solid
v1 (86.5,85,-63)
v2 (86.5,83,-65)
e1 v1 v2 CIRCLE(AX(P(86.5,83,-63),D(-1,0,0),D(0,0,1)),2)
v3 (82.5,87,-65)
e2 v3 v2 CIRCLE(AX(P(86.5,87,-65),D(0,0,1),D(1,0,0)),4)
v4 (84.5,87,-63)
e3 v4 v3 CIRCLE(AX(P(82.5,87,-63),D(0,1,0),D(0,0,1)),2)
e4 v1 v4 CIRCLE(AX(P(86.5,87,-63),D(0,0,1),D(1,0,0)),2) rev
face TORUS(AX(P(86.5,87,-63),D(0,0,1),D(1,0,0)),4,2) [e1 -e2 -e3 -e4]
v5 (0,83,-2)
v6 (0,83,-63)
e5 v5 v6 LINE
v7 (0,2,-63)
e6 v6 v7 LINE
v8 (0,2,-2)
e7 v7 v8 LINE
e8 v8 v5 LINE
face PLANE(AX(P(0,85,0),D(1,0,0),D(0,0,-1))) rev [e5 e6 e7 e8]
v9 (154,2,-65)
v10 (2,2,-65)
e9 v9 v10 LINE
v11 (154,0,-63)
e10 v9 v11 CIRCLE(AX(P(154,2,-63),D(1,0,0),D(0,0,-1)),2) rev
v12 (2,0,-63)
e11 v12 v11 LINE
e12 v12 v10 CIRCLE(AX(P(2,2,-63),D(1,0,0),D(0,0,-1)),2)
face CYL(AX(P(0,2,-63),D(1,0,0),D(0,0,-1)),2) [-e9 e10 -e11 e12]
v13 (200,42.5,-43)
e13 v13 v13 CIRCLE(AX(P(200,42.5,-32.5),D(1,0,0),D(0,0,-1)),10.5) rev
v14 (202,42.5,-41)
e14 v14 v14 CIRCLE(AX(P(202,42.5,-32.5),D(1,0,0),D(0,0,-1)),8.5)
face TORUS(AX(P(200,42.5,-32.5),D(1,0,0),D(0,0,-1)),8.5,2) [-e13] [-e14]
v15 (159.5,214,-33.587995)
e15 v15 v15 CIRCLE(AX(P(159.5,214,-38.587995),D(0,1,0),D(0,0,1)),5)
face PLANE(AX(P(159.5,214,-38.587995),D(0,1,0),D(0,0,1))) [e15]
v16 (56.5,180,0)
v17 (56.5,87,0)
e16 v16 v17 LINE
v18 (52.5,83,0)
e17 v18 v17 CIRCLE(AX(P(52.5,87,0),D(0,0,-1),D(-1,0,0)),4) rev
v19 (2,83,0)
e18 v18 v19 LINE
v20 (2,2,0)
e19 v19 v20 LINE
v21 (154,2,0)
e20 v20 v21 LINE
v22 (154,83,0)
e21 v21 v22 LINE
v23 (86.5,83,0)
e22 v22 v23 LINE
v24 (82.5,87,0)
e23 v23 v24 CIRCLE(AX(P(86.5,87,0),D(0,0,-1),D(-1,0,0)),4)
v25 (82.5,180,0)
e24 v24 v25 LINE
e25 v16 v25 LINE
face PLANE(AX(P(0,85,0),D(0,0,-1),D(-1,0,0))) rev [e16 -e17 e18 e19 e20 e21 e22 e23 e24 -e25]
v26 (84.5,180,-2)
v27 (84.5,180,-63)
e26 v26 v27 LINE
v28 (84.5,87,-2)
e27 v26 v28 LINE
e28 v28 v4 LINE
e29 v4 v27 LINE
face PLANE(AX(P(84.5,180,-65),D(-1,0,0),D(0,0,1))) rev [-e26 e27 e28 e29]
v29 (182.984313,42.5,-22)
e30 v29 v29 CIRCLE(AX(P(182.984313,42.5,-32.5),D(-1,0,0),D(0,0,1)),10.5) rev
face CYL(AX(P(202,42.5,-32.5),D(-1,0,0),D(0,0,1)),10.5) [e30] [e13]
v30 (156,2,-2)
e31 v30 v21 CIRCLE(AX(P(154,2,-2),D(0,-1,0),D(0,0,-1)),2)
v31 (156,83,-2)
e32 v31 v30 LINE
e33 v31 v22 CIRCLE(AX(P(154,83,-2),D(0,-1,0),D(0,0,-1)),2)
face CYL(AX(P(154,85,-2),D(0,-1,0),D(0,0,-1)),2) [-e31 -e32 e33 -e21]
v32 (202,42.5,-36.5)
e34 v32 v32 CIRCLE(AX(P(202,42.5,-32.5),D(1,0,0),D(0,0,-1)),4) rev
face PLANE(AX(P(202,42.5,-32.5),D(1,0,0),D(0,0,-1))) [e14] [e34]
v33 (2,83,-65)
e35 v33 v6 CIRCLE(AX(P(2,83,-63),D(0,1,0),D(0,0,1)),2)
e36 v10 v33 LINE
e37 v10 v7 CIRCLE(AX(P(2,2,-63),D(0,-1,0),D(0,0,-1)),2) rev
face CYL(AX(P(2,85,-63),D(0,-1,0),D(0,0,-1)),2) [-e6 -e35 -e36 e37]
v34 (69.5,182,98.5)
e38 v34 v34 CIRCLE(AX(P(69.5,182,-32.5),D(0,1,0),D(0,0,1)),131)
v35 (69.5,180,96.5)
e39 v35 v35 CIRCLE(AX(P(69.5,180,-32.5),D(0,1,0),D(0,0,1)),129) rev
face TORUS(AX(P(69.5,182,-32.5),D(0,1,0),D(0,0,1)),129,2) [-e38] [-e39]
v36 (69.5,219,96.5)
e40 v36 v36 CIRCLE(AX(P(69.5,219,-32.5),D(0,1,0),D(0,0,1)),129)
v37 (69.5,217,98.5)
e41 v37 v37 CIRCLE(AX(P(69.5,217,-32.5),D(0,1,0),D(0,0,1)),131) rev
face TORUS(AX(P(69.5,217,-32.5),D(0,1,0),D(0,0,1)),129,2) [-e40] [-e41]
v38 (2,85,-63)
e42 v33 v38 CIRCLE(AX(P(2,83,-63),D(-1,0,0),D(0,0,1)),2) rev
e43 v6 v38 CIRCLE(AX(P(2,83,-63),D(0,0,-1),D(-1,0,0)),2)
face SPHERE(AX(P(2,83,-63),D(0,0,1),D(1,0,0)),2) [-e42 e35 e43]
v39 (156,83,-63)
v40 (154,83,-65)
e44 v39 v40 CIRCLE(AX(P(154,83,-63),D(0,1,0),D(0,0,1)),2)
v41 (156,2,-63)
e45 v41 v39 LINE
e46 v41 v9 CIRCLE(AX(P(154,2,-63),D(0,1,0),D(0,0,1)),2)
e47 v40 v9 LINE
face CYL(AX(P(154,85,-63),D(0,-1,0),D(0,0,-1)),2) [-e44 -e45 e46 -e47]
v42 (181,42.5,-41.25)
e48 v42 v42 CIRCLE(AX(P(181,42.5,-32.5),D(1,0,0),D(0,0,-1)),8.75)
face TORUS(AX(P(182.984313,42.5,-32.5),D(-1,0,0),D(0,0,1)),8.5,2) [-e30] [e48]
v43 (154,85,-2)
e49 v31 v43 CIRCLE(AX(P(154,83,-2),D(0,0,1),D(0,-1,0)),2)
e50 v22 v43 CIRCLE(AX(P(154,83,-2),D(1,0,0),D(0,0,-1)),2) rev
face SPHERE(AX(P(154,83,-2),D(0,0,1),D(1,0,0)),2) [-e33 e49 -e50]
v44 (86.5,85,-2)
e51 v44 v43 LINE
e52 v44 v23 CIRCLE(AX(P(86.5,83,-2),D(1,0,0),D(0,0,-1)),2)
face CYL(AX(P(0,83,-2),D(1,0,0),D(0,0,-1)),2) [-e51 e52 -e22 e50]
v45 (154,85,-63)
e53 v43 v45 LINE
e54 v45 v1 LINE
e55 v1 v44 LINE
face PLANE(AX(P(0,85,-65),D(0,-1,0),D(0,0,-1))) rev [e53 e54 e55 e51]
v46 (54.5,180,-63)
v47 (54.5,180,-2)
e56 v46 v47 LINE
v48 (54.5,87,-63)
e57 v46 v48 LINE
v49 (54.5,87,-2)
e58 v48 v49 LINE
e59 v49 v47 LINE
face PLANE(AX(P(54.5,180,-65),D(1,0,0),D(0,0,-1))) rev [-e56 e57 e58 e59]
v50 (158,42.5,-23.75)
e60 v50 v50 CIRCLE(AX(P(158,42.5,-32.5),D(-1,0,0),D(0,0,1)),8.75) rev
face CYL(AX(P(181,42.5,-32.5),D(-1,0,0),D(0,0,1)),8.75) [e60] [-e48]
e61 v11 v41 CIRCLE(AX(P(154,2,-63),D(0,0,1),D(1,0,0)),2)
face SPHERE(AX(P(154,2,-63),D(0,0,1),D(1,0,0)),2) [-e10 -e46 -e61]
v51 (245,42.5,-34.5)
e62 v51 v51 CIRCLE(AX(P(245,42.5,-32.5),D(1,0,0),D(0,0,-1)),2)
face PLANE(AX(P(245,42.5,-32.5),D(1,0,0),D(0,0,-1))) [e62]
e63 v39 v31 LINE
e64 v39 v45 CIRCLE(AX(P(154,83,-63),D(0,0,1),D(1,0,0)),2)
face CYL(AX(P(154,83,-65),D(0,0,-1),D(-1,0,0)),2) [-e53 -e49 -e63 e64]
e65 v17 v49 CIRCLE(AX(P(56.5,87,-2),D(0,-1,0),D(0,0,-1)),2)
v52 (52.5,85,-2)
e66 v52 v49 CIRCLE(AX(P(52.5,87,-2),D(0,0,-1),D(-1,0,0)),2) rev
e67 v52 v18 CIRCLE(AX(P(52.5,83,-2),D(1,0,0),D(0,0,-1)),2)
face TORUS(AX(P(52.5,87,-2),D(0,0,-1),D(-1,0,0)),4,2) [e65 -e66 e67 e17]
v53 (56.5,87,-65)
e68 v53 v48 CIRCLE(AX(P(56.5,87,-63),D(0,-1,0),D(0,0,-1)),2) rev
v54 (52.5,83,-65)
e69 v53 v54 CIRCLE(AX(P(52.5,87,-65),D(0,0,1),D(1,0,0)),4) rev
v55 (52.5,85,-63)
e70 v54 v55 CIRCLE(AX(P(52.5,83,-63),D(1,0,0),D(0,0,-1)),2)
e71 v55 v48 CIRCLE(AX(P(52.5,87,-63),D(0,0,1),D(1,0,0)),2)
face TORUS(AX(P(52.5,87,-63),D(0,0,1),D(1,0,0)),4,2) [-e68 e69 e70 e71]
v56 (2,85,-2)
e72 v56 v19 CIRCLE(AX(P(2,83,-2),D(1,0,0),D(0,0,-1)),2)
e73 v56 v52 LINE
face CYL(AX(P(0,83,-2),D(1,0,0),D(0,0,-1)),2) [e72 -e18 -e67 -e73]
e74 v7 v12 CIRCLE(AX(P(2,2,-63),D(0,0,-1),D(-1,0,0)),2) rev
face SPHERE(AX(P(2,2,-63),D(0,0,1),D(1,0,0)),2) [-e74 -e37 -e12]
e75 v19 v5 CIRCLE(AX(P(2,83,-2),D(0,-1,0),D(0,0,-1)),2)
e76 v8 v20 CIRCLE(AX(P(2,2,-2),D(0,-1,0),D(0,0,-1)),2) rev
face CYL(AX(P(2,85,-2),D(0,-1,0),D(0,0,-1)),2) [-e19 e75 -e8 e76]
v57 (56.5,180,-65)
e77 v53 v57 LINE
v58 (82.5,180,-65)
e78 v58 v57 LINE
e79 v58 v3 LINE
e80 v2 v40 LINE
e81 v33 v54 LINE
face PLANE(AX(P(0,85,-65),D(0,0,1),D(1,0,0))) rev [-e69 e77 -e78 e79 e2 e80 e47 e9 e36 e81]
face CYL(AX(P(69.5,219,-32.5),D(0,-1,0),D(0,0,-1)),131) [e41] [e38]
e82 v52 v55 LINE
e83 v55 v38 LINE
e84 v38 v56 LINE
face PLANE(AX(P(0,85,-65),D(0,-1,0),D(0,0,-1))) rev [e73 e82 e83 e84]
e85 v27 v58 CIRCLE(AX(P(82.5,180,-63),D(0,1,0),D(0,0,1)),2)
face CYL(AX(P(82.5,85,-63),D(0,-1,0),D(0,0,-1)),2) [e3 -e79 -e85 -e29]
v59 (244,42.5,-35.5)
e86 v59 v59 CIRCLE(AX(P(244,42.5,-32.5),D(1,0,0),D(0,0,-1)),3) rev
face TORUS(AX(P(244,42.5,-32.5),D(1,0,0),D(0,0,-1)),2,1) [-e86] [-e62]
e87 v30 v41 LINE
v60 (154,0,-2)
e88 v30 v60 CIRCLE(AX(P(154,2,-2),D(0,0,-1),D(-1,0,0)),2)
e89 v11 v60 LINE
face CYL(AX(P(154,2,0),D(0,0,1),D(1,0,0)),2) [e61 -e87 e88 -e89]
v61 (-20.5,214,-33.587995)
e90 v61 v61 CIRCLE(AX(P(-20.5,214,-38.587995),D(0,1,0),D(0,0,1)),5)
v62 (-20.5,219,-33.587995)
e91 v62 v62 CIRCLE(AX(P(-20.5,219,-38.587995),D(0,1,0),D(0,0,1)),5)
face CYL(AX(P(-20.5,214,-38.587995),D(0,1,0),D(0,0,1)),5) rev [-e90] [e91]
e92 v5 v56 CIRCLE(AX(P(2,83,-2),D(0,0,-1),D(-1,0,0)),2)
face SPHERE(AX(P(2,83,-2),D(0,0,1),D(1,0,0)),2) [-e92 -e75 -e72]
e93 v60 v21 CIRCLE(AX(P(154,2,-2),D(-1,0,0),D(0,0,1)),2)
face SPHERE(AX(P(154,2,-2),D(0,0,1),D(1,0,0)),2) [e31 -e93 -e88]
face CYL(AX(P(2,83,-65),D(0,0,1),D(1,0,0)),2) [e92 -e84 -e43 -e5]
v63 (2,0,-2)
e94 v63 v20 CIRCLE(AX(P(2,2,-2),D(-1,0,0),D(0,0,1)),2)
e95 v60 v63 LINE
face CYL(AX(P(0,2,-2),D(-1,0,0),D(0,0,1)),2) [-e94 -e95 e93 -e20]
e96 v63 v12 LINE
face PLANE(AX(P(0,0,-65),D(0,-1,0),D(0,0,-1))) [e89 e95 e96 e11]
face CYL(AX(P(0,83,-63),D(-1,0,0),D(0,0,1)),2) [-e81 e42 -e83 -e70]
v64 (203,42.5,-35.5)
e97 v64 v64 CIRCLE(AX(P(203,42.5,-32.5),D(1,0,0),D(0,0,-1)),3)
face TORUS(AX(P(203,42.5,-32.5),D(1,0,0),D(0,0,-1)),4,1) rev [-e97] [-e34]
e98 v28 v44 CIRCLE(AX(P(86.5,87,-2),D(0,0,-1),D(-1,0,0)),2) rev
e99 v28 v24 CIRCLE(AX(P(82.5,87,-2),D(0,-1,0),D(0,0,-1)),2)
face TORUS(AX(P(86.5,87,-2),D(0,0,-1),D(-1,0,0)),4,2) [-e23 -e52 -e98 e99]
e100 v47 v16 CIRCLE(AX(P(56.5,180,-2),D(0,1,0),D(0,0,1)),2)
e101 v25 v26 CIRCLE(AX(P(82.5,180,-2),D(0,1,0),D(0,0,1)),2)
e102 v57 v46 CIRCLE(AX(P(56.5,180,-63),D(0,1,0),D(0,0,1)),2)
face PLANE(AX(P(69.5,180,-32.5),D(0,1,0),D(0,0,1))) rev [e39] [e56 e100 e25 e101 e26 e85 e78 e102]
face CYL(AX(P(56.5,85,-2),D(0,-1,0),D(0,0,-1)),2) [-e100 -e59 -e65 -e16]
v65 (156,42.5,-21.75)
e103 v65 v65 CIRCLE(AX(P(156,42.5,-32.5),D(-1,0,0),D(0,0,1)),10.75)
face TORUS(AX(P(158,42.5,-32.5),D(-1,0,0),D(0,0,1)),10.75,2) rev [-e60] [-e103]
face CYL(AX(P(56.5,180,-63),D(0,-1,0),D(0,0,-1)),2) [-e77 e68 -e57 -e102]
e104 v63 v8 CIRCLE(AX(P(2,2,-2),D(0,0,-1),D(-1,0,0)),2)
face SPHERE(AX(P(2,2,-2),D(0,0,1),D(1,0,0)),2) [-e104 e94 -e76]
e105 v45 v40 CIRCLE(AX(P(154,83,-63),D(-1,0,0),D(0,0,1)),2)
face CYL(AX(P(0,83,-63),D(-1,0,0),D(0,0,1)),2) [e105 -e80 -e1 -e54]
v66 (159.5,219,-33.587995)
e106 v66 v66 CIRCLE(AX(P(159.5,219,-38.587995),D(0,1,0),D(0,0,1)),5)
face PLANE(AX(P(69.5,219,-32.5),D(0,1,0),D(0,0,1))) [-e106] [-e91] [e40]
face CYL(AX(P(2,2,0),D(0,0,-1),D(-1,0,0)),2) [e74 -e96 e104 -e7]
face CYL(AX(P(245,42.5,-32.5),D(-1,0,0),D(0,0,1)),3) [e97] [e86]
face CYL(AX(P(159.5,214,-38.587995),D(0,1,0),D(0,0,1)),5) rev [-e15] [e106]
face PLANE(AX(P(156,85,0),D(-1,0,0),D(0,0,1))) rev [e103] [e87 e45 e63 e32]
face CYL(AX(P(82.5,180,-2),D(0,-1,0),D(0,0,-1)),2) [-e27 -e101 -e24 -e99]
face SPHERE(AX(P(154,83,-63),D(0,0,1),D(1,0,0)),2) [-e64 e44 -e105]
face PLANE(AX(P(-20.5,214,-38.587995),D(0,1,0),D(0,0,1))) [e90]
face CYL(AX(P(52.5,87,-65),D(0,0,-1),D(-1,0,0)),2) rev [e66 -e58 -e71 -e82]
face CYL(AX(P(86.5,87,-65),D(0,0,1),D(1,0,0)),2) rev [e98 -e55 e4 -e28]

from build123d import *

# Parameters (mm, degrees)
SKETCH1_W           = 156
SKETCH1_H           = 65
BOSS_EXTRUDE1_DEPTH = 85
SKETCH2_R           = 10.5
BOSS_EXTRUDE2_DEPTH = 46
SKETCH3_R           = 3
BOSS_EXTRUDE3_DEPTH = 43
SKETCH4_R           = 10.5
SKETCH4_R_2         = 8.75
CUT_EXTRUDE2_DEPTH  = 25
SKETCH5_W           = 30
SKETCH5_H           = 65
BOSS_EXTRUDE4_DEPTH = 95
SKETCH6_R           = 131
BOSS_EXTRUDE5_DEPTH = 39
SKETCH7_R           = 5
CUT_EXTRUDE3_DEPTH  = 5
FILLET10_R          = 2
FILLET11_R          = 2
FILLET12_R          = 2
FILLET13_R          = 2
FILLET14_R          = 1
FILLET15_R          = 1


with BuildPart() as part:
    # Sketch1 → Boss-Extrude1 (new body)
    with BuildSketch(Plane(origin=(0, 0, 0), x_dir=(1, 0, 0), z_dir=(0, 1, 0))):
        with Locations((78, 32.5)):
            Rectangle(SKETCH1_W, SKETCH1_H)
    extrude(amount=BOSS_EXTRUDE1_DEPTH)

    # Sketch2 → Boss-Extrude2 (add)
    with BuildSketch(Plane(origin=(156, 0, 0), x_dir=(0, 0, -1), z_dir=(1, 0, 0))):
        with Locations(Location((32.5, 42.5, 0), (0, 0, 180))):
            Circle(SKETCH2_R)
    extrude(amount=BOSS_EXTRUDE2_DEPTH)

    # Sketch3 → Boss-Extrude3 (add)
    with BuildSketch(Plane(origin=(202, 0, 0), x_dir=(0, 0, -1), z_dir=(1, 0, 0))):
        with Locations((32.5, 42.5)):
            Circle(SKETCH3_R)
    extrude(amount=BOSS_EXTRUDE3_DEPTH)

    # Sketch4 → Cut-Extrude2 (cut)
    with BuildSketch(Plane(origin=(156, 0, 0), x_dir=(0, 0, -1), z_dir=(1, 0, 0))):
        with Locations((32.5, 42.5)):
            Circle(SKETCH4_R)
        with Locations((32.5, 42.5)):
            Circle(SKETCH4_R_2, mode=Mode.SUBTRACT)
    extrude(amount=CUT_EXTRUDE2_DEPTH, mode=Mode.SUBTRACT)

    # Sketch5 → Boss-Extrude4 (add)
    with BuildSketch(Plane(origin=(0, 85, 0), x_dir=(1, 0, 0), z_dir=(0, 1, 0))):
        with Locations((69.5, 32.5)):
            Rectangle(SKETCH5_W, SKETCH5_H)
    extrude(amount=BOSS_EXTRUDE4_DEPTH)

    # Sketch6 → Boss-Extrude5 (add)
    with BuildSketch(Plane(origin=(0, 180, 0), x_dir=(1, 0, 0), z_dir=(0, 1, 0))):
        with Locations(Location((69.5, 32.5, 0), (0, 0, 270))):
            Circle(SKETCH6_R)
    extrude(amount=BOSS_EXTRUDE5_DEPTH)

    # Sketch7 → Cut-Extrude3 (cut)
    with BuildSketch(Plane(origin=(0, 219, 0), x_dir=(-1, 0, 0), z_dir=(0, 1, 0))):
        with Locations(Location((20.5, -38.587995043, 0), (0, 0, 90))):
            Circle(SKETCH7_R)
        with Locations(Location((-159.5, -38.587995043, 0), (0, 0, 90))):
            Circle(SKETCH7_R)
    extrude(amount=-CUT_EXTRUDE3_DEPTH, mode=Mode.SUBTRACT)

    # Fillet10
    fillet10_edges = [part.edges().sort_by_distance(p)[0] for p in [
        (0, 42.5, 0),
    ]]
    fillet(fillet10_edges, radius=FILLET10_R)

    # Fillet11
    fillet11_edges = [part.edges().sort_by_distance(p)[0] for p in [
        (54.5, 132.5, -65),
        (54.5, 132.5, 0),
        (79, 0, 0),
        (54.5, 85, -32.5),
        (84.5, 85, -32.5),
        (0, 0, -33.5),
        (0, 85, -33.5),
        (28.25, 85, 0),
        (27.25, 85, -65),
        (0, 42.5, -65),
        (0.585786438, 0, -0.585786438),
        (0.585786438, 85, -0.585786438),
    ]]
    fillet(fillet11_edges, radius=FILLET11_R)

    # Fillet12
    # the kernel refuses this fillet: 2 mm, written as the material it takes off along each edge
    with BuildSketch(Plane(origin=(2, 2, -63), x_dir=(0, 0, -1), z_dir=(0, -1, 0))) as fillet12_piece_1_section:
        Polygon((0, 0), (FILLET12_R, 0), (FILLET12_R, -FILLET12_R), (0, -FILLET12_R), align=None)
    fillet12_piece_1 = extrude(amount=FILLET12_R, mode=Mode.PRIVATE)
    fillet12_piece_1 = fillet12_piece_1 - Plane(origin=(2, 2, -63), x_dir=(0.7071067811865475, 0, 0.7071067811865475), z_dir=(0, -1, 0)) * Sphere(FILLET12_R, mode=Mode.PRIVATE)
    add(fillet12_piece_1, mode=Mode.SUBTRACT)
    with BuildSketch(Plane(origin=(161, 85, -65), x_dir=(0, 0, 1), z_dir=(-1, 0, 0))) as fillet12_piece_2:
        with BuildLine():
            CenterArc((FILLET12_R, -FILLET12_R), FILLET12_R, 90, 90)
            Line((0, -FILLET12_R), (0, 0))
            Line((0, 0), (FILLET12_R, 0))
        make_face()
    extrude(amount=74.5, mode=Mode.SUBTRACT)
    with BuildSketch(Plane(origin=(84.5, 87, 0), x_dir=(-1, 0, 0), z_dir=(0, 1, 0)), Plane(origin=(84.5, 87, -65), x_dir=(0, 0, 1), z_dir=(0, 1, 0))) as fillet12_piece_3:
        with BuildLine():
            CenterArc((FILLET12_R, -FILLET12_R), FILLET12_R, 90, 90)
            Line((0, -FILLET12_R), (0, 0))
            Line((0, 0), (FILLET12_R, 0))
        make_face()
    extrude(amount=93, mode=Mode.SUBTRACT)
    with BuildSketch(Plane(origin=(161, 0, -65), x_dir=(0, 0, 1), z_dir=(-1, 0, 0))) as fillet12_piece_4:
        with BuildLine():
            CenterArc((FILLET12_R, FILLET12_R), FILLET12_R, 180, 90)
            Line((0, FILLET12_R), (0, 0))
            Line((0, 0), (FILLET12_R, 0))
        make_face()
    extrude(amount=159, mode=Mode.SUBTRACT)
    with BuildSketch(Plane(origin=(86.5, 85, 0), x_dir=(0, -1, 0), z_dir=(1, 0, 0))) as fillet12_piece_5:
        with BuildLine():
            CenterArc((FILLET12_R, FILLET12_R), FILLET12_R, 180, 90)
            Line((0, FILLET12_R), (0, 0))
            Line((0, 0), (FILLET12_R, 0))
        make_face()
    extrude(amount=74.5, mode=Mode.SUBTRACT)
    with BuildSketch(Plane(origin=(156, 0, -2), x_dir=(0, 1, 0), z_dir=(0, 0, -1))) as fillet12_piece_6:
        with BuildLine():
            CenterArc((FILLET12_R, -FILLET12_R), FILLET12_R, 90, 90)
            Line((0, -FILLET12_R), (0, 0))
            Line((0, 0), (FILLET12_R, 0))
        make_face()
    extrude(amount=68, mode=Mode.SUBTRACT)
    with BuildSketch(Plane(origin=(156, 2, 0), x_dir=(-1, 0, 0), z_dir=(0, 1, 0))) as fillet12_piece_7:
        with BuildLine():
            CenterArc((FILLET12_R, -FILLET12_R), FILLET12_R, 90, 90)
            Line((0, -FILLET12_R), (0, 0))
            Line((0, 0), (FILLET12_R, 0))
        make_face()
    extrude(amount=88, mode=Mode.SUBTRACT)
    with BuildSketch(Plane(origin=(156, 2, -2), x_dir=(0, 0, 1), z_dir=(0, 1, 0))) as fillet12_piece_8:
        with BuildLine():
            CenterArc((2 - FILLET12_R, -FILLET12_R), FILLET12_R, 0, 90)
            Line((2 - FILLET12_R, 0), (2, 0))
            Line((2, 0), (2, -FILLET12_R))
        make_face()
    revolve(axis=Axis((156, 2, -2), (1, 0, 0)), revolution_arc=90, mode=Mode.SUBTRACT)
    with BuildSketch(Plane(origin=(86.5, 87, -65), x_dir=(-1, 0, 0), z_dir=(0, 1, 0))) as fillet12_piece_9:
        with BuildLine():
            CenterArc((2 + FILLET12_R, FILLET12_R), FILLET12_R, 180, 90)
            Line((2 + FILLET12_R, 0), (2, 0))
            Line((2, 0), (2, FILLET12_R))
        make_face()
    revolve(axis=Axis((86.5, 87, -65), (0, 0, 1)), revolution_arc=90, mode=Mode.SUBTRACT)
    with BuildSketch(Plane(origin=(86.5, 87, 0), x_dir=(-1, 0, 0), z_dir=(0, 1, 0))) as fillet12_piece_10:
        with BuildLine():
            CenterArc((2 + FILLET12_R, -FILLET12_R), FILLET12_R, 90, 90)
            Line((2, -FILLET12_R), (2, 0))
            Line((2, 0), (2 + FILLET12_R, 0))
        make_face()
    revolve(axis=Axis((86.5, 87, 0), (0, 0, 1)), revolution_arc=90, mode=Mode.SUBTRACT)

    # Fillet13
    # the kernel refuses this fillet: 2 mm, written as the material it adds along each edge
    with BuildSketch(Plane(origin=(156, 42.5, -32.5), x_dir=(0, 0, -1), z_dir=(0, -1, 0))) as fillet13_piece_1:
        with BuildLine():
            CenterArc((8.75 + FILLET13_R, FILLET13_R), FILLET13_R, 180, 90)
            Line((8.75, FILLET13_R), (8.75, 0))
            Line((8.75, 0), (8.75 + FILLET13_R, 0))
        make_face()
    revolve(axis=Axis((156, 42.5, -32.5), (1, 0, 0)))
    # the kernel refuses this fillet: 2 mm, written as the material it takes off along each edge
    with BuildSketch(Plane(origin=(154, 83, -2), x_dir=(0, 1, 0), z_dir=(1, 0, 0))) as fillet13_2_piece_1_section:
        Polygon((0, 0), (FILLET13_R * 1.02, 0), (FILLET13_R * 1.02, FILLET13_R * 1.02), (0, FILLET13_R * 1.02), align=None)
    fillet13_2_piece_1 = extrude(amount=FILLET13_R * 1.02, mode=Mode.PRIVATE)
    fillet13_2_piece_1 = fillet13_2_piece_1 - Plane(origin=(154, 83, -2), x_dir=(0, -0.7071067811865475, -0.7071067811865475), z_dir=(1, 0, 0)) * Sphere(FILLET13_R, mode=Mode.PRIVATE)
    add(fillet13_2_piece_1, mode=Mode.SUBTRACT)
    with BuildSketch(Plane(origin=(154, 2, -63), x_dir=(0, 0, -1), z_dir=(1, 0, 0))) as fillet13_2_piece_2_section:
        Polygon((0, 0), (FILLET13_R * 1.02, 0), (FILLET13_R * 1.02, -FILLET13_R * 1.02), (0, -FILLET13_R * 1.02), align=None)
    fillet13_2_piece_2 = extrude(amount=FILLET13_R * 1.02, mode=Mode.PRIVATE)
    fillet13_2_piece_2 = fillet13_2_piece_2 - Plane(origin=(154, 2, -63), x_dir=(0, 0.7071067811865475, 0.7071067811865475), z_dir=(1, 0, 0)) * Sphere(FILLET13_R, mode=Mode.PRIVATE)
    add(fillet13_2_piece_2, mode=Mode.SUBTRACT)
    with BuildSketch(Plane(origin=(156, 2, -65), x_dir=(0, 0, 1), z_dir=(0, 1, 0))) as fillet13_2_piece_3:
        with BuildLine():
            CenterArc((FILLET13_R, -FILLET13_R), FILLET13_R, 90, 90)
            Line((0, -FILLET13_R), (0, 0))
            Line((0, 0), (FILLET13_R, 0))
        make_face()
    extrude(amount=81, mode=Mode.SUBTRACT)
    with BuildSketch(Plane(origin=(156, 85, -2), x_dir=(0, -1, 0), z_dir=(0, 0, -1))) as fillet13_2_piece_4:
        with BuildLine():
            CenterArc((FILLET13_R, FILLET13_R), FILLET13_R, 180, 90)
            Line((0, FILLET13_R), (0, 0))
            Line((0, 0), (FILLET13_R, 0))
        make_face()
    extrude(amount=61, mode=Mode.SUBTRACT)
    with BuildSketch(Plane(origin=(156, 83, -63), x_dir=(0, 0, -1), z_dir=(0, -1, 0))) as fillet13_2_piece_5:
        with BuildLine():
            CenterArc((2 - FILLET13_R, -FILLET13_R), FILLET13_R, 0, 90)
            Line((2, -FILLET13_R), (2, 0))
            Line((2, 0), (2 - FILLET13_R, 0))
        make_face()
    revolve(axis=Axis((156, 83, -63), (1, 0, 0)), revolution_arc=90, mode=Mode.SUBTRACT)
    with BuildSketch(Plane(origin=(202, 42.5, -32.5), x_dir=(0, 0, 1), z_dir=(0, 1, 0))) as fillet13_2_piece_6:
        with BuildLine():
            CenterArc((10.5 - FILLET13_R, -FILLET13_R), FILLET13_R, 0, 90)
            Line((10.5 - FILLET13_R, 0), (10.5, 0))
            Line((10.5, 0), (10.5, -FILLET13_R))
        make_face()
    revolve(axis=Axis((202, 42.5, -32.5), (1, 0, 0)), mode=Mode.SUBTRACT)
    with BuildSketch(Plane(origin=(181, 42.5, -32.5), x_dir=(0, 0, 1), z_dir=(0, -1, 0))) as fillet13_2_piece_7:
        with BuildLine():
            CenterArc((8.5, -1.984313483), FILLET13_R, 0, 82.819244219)
            Line((10.5, -1.984313483), (10.5, 0))
            Line((10.5, 0), (8.75, 0))
        make_face()
    revolve(axis=Axis((181, 42.5, -32.5), (-1, 0, 0)), mode=Mode.SUBTRACT)
    with BuildSketch(Plane(origin=(69.5, 180, -32.5), x_dir=(0, 0, 1), z_dir=(-1, 0, 0))) as fillet13_2_piece_8:
        with BuildLine():
            CenterArc((131 - FILLET13_R, FILLET13_R), FILLET13_R, 270, 90)
            Line((131, FILLET13_R), (131, 0))
            Line((131, 0), (131 - FILLET13_R, 0))
        make_face()
    revolve(axis=Axis((69.5, 180, -32.5), (0, 1, 0)), mode=Mode.SUBTRACT)
    with BuildSketch(Plane(origin=(69.5, 219, -32.5), x_dir=(0, 0, 1), z_dir=(-1, 0, 0))) as fillet13_2_piece_9:
        with BuildLine():
            CenterArc((131 - FILLET13_R, -FILLET13_R), FILLET13_R, 0, 90)
            Line((131 - FILLET13_R, 0), (131, 0))
            Line((131, 0), (131, -FILLET13_R))
        make_face()
    revolve(axis=Axis((69.5, 219, -32.5), (0, 1, 0)), mode=Mode.SUBTRACT)

    # Fillet14
    fillet14_edges = [part.edges().sort_by_distance(p)[0] for p in [
        (245, 42.5, -29.5),
    ]]
    fillet(fillet14_edges, radius=FILLET14_R)

    # Fillet15
    fillet15_edges = [part.edges().sort_by_distance(p)[0] for p in [
        (202, 42.5, -29.5),
    ]]
    fillet(fillet15_edges, radius=FILLET15_R)


solid = part.part
